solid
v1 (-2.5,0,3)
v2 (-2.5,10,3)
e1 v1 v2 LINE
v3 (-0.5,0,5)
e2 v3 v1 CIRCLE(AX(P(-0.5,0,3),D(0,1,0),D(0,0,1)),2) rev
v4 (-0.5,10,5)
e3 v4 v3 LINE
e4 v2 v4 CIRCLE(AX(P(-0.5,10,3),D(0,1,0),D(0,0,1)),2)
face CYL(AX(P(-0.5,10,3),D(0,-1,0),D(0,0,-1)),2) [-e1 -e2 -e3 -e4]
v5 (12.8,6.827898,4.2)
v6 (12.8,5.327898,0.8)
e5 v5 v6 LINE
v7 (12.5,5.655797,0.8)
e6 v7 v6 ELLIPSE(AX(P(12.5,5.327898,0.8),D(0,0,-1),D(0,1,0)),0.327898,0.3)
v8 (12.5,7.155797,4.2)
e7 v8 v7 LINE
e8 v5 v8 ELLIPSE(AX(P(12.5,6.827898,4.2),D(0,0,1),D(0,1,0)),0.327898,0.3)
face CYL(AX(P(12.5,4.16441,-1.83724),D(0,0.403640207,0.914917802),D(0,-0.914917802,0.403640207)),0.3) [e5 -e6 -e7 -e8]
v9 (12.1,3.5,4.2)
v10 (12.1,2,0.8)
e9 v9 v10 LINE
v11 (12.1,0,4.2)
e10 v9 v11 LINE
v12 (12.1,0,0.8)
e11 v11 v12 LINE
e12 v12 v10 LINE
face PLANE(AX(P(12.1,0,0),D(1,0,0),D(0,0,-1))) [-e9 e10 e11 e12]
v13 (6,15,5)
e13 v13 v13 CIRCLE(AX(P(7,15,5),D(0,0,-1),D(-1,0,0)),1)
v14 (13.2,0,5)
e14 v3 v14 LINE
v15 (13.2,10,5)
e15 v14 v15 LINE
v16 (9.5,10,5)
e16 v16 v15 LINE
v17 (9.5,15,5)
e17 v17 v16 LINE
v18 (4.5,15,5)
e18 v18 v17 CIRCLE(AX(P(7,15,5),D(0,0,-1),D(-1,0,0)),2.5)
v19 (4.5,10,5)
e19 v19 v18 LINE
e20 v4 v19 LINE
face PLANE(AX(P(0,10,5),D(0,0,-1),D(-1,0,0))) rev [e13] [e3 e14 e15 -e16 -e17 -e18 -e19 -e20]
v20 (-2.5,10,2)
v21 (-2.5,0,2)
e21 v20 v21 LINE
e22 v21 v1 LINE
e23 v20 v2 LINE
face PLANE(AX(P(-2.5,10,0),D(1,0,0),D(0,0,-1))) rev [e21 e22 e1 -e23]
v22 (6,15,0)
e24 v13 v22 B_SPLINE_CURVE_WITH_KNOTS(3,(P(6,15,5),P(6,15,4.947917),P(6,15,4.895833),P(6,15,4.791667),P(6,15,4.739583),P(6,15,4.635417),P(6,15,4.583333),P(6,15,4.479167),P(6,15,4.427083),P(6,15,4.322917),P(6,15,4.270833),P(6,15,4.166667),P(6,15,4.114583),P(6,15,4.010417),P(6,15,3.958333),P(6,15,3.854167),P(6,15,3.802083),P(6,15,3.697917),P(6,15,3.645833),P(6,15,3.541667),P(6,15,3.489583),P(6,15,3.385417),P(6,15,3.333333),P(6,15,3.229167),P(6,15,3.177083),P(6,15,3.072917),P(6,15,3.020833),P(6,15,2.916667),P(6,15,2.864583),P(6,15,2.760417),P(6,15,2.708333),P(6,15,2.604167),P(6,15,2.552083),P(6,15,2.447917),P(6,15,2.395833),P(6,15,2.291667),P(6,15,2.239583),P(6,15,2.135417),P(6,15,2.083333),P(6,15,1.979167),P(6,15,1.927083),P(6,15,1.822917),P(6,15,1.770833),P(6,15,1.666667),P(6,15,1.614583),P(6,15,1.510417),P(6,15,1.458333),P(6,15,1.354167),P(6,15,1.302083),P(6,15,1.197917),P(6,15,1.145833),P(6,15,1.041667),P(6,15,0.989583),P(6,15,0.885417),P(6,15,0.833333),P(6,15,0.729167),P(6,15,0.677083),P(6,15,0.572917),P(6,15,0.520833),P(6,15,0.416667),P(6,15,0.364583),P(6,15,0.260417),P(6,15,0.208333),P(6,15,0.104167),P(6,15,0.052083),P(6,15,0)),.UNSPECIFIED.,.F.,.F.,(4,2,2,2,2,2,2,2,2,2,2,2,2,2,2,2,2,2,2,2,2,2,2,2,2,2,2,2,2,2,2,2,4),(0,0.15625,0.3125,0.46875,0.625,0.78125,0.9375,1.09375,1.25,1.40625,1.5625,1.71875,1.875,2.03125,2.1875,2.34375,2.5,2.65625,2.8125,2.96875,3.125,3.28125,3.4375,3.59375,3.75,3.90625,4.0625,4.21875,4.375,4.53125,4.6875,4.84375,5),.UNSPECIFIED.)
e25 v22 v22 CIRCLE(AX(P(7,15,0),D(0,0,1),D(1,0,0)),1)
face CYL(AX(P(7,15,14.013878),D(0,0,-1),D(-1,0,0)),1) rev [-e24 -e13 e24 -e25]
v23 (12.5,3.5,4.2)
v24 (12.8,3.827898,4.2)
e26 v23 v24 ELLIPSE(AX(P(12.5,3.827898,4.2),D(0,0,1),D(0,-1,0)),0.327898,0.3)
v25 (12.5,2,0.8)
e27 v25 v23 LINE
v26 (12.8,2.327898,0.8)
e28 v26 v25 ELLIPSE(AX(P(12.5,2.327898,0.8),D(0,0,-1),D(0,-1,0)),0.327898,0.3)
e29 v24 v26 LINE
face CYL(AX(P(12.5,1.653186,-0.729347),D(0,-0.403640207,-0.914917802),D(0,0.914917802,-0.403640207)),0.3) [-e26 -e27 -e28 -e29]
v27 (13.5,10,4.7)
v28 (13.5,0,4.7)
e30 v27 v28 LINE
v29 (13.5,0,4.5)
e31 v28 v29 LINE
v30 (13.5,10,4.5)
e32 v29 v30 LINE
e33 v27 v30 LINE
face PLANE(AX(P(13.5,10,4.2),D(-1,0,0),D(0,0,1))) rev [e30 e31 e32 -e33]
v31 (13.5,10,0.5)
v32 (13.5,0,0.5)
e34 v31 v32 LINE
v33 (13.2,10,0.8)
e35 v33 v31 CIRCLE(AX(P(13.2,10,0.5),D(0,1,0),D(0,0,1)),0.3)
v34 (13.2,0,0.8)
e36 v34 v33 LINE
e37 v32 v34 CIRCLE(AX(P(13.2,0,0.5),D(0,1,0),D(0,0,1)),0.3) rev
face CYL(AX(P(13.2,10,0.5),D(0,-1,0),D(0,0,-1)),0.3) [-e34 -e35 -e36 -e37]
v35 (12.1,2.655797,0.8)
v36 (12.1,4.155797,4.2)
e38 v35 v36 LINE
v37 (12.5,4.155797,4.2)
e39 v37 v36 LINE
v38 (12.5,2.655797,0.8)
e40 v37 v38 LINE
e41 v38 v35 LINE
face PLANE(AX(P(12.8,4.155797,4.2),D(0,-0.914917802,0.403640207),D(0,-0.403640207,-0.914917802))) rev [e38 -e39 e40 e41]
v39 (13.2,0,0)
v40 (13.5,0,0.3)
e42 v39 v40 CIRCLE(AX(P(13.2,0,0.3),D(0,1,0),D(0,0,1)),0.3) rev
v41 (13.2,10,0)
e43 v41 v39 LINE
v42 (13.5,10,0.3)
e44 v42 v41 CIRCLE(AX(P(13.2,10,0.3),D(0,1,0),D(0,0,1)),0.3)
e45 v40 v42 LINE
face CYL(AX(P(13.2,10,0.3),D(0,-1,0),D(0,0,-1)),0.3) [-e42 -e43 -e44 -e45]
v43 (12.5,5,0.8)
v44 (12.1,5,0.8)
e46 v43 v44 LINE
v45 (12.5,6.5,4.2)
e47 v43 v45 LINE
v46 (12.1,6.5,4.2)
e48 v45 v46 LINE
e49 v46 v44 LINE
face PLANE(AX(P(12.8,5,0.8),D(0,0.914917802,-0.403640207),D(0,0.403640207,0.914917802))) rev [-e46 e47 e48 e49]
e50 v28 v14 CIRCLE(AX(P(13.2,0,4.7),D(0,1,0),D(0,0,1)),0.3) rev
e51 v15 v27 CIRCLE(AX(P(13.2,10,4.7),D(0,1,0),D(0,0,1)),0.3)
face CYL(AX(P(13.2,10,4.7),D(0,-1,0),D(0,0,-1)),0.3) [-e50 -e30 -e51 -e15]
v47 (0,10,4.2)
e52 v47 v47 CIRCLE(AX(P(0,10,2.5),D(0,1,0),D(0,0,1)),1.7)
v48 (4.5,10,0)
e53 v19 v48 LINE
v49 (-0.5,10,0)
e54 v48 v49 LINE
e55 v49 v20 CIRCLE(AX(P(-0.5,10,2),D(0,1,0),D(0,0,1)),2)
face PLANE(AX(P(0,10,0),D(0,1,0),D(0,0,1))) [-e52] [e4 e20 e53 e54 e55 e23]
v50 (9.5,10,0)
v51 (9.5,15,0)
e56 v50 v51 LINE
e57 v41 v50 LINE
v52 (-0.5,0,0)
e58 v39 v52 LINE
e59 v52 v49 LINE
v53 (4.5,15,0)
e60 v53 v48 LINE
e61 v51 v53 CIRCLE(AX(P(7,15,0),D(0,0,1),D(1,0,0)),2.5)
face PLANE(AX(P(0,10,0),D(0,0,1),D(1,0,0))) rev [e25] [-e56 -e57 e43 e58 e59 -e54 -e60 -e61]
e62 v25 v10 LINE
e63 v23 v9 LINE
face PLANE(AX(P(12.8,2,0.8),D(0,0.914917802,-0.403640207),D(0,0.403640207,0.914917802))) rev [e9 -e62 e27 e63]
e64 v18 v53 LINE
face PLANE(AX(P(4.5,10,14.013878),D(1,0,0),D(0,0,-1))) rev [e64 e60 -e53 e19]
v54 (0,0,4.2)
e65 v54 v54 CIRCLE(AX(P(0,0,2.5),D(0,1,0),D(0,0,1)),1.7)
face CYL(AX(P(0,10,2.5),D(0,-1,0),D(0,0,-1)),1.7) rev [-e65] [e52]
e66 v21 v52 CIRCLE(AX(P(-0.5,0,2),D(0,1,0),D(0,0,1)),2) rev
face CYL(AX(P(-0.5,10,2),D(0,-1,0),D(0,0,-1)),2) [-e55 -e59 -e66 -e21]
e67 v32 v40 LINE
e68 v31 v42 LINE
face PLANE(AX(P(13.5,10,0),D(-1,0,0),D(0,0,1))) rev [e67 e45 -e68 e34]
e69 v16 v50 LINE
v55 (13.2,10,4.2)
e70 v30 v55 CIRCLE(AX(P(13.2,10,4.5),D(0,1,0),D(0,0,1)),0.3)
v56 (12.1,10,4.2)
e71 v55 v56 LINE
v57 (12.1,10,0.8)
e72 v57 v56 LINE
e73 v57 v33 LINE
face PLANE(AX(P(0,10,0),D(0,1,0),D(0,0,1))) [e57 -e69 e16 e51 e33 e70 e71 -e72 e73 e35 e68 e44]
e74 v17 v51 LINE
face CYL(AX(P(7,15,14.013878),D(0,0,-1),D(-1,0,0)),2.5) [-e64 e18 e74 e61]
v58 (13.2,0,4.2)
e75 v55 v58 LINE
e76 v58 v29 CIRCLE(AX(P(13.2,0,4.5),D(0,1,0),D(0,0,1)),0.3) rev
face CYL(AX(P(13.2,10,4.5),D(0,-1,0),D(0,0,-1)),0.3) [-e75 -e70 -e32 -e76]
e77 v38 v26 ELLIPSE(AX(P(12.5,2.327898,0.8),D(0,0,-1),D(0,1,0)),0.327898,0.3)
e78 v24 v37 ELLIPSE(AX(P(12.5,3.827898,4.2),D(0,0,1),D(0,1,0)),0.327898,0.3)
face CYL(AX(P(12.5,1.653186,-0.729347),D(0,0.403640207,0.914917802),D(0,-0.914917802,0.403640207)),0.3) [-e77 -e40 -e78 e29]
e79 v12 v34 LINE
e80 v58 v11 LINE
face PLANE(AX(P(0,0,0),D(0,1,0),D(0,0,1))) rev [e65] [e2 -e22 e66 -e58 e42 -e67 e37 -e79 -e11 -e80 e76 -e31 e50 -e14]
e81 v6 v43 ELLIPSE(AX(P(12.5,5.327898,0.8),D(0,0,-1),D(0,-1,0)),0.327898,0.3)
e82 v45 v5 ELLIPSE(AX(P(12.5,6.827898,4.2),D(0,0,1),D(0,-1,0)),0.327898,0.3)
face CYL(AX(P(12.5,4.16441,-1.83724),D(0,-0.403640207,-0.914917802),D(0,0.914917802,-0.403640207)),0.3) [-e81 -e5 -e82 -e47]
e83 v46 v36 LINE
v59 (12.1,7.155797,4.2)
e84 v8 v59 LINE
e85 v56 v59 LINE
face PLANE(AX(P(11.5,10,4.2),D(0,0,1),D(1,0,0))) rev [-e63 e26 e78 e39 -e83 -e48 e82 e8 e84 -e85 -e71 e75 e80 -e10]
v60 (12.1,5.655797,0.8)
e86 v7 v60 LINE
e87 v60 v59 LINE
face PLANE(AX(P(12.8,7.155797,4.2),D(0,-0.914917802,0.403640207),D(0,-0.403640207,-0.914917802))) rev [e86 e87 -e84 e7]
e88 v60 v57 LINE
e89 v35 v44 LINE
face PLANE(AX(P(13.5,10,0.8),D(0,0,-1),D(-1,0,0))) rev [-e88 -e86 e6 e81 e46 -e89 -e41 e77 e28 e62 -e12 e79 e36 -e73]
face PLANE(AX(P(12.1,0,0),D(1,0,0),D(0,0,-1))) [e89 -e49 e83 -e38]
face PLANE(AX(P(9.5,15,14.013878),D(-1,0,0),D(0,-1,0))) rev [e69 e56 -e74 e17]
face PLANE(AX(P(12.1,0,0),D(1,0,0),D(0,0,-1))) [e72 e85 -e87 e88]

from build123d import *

# Parameters (mm, degrees)
SKETCH_1_R      = 1.7
EXTRUDE_1_DEPTH = 10
EXTRUDE_2_DEPTH = 1.3
FILLET_1_R      = 0.3
FILLET_2_R      = 0.3
SKETCH_3_R      = 1
EXTRUDE_3_DEPTH = 5
FILLET_3_R      = 2
SKETCH_4_W      = 3.4
SKETCH_4_H      = 10
EXTRUDE_4_DEPTH = 0.6


with BuildPart() as part:
    # 草圖1 → 填料-伸長1 (new body)
    with BuildSketch(Plane(origin=(0, 0, 0), x_dir=(1, 0, 0), z_dir=(0, 1, 0))):
        Polygon((13.5, -0.8), (11.5, -0.8), (11.5, -4.2), (13.5, -4.2), (13.5, -5), (0, -5), (-2.5, -5), (-2.5, 0), (0, 0), (13.5, 0), align=None)
        with Locations(Location((0, -2.5, 0), (0, 0, 270))):
            Circle(SKETCH_1_R, mode=Mode.SUBTRACT)
    extrude(amount=EXTRUDE_1_DEPTH)

    # 草圖2 → 填料-伸長2 (add)
    with BuildSketch(Plane(origin=(11.5, 0, 0), x_dir=(0, 0, -1), z_dir=(1, 0, 0))):
        Polygon((-4.2, 7.155796618), (-0.8, 5.655796618), (-0.8, 5), (-4.2, 6.5), align=None)
        Polygon((-4.2, 4.155796618), (-0.8, 2.655796618), (-0.8, 2), (-4.2, 3.5), align=None)
    extrude(amount=EXTRUDE_2_DEPTH)

    # 圓角1
    fillet_1_edges = [part.edges().sort_by_distance(p)[0] for p in [
        (12.8, 6.405796618, 2.5),
        (12.8, 5.75, 2.5),
        (12.8, 3.405796618, 2.5),
        (12.8, 2.75, 2.5),
    ]]
    fillet(fillet_1_edges, radius=FILLET_1_R - 0.0001)  # a hair under: the kernel refuses the full size

    # 圓角2
    fillet_2_edges = [part.edges().sort_by_distance(p)[0] for p in [
        (13.5, 5, 0),
        (13.5, 5, 0.8),
        (13.5, 5, 4.2),
        (13.5, 5, 5),
    ]]
    fillet(fillet_2_edges, radius=FILLET_2_R)

    # 草圖3 → 填料-伸長3 (add)
    with BuildSketch(Plane.XY):
        with BuildLine():
            Line((4.5, 10), (4.5, 15))
            ThreePointArc((4.5, 15), (7, 17.5), (9.5, 15))
            Line((9.5, 15), (9.5, 10))
            Line((9.5, 10), (4.5, 10))
        make_face()
        with Locations(Location((7, 15, 0), (0, 0, 180))):
            Circle(SKETCH_3_R, mode=Mode.SUBTRACT)
    extrude(amount=EXTRUDE_3_DEPTH)

    # 圓角3
    fillet_3_edges = [part.edges().sort_by_distance(p)[0] for p in [
        (-2.5, 5, 5),
        (-2.5, 5, 0),
    ]]
    fillet(fillet_3_edges, radius=FILLET_3_R)

    # 草圖4 → 填料-伸長4 (add)
    with BuildSketch(Plane(origin=(11.5, 0, 0), x_dir=(0, 0, -1), z_dir=(1, 0, 0))):
        with Locations((-2.5, 5)):
            Rectangle(SKETCH_4_W, SKETCH_4_H)
    extrude(amount=EXTRUDE_4_DEPTH)


solid = part.part
